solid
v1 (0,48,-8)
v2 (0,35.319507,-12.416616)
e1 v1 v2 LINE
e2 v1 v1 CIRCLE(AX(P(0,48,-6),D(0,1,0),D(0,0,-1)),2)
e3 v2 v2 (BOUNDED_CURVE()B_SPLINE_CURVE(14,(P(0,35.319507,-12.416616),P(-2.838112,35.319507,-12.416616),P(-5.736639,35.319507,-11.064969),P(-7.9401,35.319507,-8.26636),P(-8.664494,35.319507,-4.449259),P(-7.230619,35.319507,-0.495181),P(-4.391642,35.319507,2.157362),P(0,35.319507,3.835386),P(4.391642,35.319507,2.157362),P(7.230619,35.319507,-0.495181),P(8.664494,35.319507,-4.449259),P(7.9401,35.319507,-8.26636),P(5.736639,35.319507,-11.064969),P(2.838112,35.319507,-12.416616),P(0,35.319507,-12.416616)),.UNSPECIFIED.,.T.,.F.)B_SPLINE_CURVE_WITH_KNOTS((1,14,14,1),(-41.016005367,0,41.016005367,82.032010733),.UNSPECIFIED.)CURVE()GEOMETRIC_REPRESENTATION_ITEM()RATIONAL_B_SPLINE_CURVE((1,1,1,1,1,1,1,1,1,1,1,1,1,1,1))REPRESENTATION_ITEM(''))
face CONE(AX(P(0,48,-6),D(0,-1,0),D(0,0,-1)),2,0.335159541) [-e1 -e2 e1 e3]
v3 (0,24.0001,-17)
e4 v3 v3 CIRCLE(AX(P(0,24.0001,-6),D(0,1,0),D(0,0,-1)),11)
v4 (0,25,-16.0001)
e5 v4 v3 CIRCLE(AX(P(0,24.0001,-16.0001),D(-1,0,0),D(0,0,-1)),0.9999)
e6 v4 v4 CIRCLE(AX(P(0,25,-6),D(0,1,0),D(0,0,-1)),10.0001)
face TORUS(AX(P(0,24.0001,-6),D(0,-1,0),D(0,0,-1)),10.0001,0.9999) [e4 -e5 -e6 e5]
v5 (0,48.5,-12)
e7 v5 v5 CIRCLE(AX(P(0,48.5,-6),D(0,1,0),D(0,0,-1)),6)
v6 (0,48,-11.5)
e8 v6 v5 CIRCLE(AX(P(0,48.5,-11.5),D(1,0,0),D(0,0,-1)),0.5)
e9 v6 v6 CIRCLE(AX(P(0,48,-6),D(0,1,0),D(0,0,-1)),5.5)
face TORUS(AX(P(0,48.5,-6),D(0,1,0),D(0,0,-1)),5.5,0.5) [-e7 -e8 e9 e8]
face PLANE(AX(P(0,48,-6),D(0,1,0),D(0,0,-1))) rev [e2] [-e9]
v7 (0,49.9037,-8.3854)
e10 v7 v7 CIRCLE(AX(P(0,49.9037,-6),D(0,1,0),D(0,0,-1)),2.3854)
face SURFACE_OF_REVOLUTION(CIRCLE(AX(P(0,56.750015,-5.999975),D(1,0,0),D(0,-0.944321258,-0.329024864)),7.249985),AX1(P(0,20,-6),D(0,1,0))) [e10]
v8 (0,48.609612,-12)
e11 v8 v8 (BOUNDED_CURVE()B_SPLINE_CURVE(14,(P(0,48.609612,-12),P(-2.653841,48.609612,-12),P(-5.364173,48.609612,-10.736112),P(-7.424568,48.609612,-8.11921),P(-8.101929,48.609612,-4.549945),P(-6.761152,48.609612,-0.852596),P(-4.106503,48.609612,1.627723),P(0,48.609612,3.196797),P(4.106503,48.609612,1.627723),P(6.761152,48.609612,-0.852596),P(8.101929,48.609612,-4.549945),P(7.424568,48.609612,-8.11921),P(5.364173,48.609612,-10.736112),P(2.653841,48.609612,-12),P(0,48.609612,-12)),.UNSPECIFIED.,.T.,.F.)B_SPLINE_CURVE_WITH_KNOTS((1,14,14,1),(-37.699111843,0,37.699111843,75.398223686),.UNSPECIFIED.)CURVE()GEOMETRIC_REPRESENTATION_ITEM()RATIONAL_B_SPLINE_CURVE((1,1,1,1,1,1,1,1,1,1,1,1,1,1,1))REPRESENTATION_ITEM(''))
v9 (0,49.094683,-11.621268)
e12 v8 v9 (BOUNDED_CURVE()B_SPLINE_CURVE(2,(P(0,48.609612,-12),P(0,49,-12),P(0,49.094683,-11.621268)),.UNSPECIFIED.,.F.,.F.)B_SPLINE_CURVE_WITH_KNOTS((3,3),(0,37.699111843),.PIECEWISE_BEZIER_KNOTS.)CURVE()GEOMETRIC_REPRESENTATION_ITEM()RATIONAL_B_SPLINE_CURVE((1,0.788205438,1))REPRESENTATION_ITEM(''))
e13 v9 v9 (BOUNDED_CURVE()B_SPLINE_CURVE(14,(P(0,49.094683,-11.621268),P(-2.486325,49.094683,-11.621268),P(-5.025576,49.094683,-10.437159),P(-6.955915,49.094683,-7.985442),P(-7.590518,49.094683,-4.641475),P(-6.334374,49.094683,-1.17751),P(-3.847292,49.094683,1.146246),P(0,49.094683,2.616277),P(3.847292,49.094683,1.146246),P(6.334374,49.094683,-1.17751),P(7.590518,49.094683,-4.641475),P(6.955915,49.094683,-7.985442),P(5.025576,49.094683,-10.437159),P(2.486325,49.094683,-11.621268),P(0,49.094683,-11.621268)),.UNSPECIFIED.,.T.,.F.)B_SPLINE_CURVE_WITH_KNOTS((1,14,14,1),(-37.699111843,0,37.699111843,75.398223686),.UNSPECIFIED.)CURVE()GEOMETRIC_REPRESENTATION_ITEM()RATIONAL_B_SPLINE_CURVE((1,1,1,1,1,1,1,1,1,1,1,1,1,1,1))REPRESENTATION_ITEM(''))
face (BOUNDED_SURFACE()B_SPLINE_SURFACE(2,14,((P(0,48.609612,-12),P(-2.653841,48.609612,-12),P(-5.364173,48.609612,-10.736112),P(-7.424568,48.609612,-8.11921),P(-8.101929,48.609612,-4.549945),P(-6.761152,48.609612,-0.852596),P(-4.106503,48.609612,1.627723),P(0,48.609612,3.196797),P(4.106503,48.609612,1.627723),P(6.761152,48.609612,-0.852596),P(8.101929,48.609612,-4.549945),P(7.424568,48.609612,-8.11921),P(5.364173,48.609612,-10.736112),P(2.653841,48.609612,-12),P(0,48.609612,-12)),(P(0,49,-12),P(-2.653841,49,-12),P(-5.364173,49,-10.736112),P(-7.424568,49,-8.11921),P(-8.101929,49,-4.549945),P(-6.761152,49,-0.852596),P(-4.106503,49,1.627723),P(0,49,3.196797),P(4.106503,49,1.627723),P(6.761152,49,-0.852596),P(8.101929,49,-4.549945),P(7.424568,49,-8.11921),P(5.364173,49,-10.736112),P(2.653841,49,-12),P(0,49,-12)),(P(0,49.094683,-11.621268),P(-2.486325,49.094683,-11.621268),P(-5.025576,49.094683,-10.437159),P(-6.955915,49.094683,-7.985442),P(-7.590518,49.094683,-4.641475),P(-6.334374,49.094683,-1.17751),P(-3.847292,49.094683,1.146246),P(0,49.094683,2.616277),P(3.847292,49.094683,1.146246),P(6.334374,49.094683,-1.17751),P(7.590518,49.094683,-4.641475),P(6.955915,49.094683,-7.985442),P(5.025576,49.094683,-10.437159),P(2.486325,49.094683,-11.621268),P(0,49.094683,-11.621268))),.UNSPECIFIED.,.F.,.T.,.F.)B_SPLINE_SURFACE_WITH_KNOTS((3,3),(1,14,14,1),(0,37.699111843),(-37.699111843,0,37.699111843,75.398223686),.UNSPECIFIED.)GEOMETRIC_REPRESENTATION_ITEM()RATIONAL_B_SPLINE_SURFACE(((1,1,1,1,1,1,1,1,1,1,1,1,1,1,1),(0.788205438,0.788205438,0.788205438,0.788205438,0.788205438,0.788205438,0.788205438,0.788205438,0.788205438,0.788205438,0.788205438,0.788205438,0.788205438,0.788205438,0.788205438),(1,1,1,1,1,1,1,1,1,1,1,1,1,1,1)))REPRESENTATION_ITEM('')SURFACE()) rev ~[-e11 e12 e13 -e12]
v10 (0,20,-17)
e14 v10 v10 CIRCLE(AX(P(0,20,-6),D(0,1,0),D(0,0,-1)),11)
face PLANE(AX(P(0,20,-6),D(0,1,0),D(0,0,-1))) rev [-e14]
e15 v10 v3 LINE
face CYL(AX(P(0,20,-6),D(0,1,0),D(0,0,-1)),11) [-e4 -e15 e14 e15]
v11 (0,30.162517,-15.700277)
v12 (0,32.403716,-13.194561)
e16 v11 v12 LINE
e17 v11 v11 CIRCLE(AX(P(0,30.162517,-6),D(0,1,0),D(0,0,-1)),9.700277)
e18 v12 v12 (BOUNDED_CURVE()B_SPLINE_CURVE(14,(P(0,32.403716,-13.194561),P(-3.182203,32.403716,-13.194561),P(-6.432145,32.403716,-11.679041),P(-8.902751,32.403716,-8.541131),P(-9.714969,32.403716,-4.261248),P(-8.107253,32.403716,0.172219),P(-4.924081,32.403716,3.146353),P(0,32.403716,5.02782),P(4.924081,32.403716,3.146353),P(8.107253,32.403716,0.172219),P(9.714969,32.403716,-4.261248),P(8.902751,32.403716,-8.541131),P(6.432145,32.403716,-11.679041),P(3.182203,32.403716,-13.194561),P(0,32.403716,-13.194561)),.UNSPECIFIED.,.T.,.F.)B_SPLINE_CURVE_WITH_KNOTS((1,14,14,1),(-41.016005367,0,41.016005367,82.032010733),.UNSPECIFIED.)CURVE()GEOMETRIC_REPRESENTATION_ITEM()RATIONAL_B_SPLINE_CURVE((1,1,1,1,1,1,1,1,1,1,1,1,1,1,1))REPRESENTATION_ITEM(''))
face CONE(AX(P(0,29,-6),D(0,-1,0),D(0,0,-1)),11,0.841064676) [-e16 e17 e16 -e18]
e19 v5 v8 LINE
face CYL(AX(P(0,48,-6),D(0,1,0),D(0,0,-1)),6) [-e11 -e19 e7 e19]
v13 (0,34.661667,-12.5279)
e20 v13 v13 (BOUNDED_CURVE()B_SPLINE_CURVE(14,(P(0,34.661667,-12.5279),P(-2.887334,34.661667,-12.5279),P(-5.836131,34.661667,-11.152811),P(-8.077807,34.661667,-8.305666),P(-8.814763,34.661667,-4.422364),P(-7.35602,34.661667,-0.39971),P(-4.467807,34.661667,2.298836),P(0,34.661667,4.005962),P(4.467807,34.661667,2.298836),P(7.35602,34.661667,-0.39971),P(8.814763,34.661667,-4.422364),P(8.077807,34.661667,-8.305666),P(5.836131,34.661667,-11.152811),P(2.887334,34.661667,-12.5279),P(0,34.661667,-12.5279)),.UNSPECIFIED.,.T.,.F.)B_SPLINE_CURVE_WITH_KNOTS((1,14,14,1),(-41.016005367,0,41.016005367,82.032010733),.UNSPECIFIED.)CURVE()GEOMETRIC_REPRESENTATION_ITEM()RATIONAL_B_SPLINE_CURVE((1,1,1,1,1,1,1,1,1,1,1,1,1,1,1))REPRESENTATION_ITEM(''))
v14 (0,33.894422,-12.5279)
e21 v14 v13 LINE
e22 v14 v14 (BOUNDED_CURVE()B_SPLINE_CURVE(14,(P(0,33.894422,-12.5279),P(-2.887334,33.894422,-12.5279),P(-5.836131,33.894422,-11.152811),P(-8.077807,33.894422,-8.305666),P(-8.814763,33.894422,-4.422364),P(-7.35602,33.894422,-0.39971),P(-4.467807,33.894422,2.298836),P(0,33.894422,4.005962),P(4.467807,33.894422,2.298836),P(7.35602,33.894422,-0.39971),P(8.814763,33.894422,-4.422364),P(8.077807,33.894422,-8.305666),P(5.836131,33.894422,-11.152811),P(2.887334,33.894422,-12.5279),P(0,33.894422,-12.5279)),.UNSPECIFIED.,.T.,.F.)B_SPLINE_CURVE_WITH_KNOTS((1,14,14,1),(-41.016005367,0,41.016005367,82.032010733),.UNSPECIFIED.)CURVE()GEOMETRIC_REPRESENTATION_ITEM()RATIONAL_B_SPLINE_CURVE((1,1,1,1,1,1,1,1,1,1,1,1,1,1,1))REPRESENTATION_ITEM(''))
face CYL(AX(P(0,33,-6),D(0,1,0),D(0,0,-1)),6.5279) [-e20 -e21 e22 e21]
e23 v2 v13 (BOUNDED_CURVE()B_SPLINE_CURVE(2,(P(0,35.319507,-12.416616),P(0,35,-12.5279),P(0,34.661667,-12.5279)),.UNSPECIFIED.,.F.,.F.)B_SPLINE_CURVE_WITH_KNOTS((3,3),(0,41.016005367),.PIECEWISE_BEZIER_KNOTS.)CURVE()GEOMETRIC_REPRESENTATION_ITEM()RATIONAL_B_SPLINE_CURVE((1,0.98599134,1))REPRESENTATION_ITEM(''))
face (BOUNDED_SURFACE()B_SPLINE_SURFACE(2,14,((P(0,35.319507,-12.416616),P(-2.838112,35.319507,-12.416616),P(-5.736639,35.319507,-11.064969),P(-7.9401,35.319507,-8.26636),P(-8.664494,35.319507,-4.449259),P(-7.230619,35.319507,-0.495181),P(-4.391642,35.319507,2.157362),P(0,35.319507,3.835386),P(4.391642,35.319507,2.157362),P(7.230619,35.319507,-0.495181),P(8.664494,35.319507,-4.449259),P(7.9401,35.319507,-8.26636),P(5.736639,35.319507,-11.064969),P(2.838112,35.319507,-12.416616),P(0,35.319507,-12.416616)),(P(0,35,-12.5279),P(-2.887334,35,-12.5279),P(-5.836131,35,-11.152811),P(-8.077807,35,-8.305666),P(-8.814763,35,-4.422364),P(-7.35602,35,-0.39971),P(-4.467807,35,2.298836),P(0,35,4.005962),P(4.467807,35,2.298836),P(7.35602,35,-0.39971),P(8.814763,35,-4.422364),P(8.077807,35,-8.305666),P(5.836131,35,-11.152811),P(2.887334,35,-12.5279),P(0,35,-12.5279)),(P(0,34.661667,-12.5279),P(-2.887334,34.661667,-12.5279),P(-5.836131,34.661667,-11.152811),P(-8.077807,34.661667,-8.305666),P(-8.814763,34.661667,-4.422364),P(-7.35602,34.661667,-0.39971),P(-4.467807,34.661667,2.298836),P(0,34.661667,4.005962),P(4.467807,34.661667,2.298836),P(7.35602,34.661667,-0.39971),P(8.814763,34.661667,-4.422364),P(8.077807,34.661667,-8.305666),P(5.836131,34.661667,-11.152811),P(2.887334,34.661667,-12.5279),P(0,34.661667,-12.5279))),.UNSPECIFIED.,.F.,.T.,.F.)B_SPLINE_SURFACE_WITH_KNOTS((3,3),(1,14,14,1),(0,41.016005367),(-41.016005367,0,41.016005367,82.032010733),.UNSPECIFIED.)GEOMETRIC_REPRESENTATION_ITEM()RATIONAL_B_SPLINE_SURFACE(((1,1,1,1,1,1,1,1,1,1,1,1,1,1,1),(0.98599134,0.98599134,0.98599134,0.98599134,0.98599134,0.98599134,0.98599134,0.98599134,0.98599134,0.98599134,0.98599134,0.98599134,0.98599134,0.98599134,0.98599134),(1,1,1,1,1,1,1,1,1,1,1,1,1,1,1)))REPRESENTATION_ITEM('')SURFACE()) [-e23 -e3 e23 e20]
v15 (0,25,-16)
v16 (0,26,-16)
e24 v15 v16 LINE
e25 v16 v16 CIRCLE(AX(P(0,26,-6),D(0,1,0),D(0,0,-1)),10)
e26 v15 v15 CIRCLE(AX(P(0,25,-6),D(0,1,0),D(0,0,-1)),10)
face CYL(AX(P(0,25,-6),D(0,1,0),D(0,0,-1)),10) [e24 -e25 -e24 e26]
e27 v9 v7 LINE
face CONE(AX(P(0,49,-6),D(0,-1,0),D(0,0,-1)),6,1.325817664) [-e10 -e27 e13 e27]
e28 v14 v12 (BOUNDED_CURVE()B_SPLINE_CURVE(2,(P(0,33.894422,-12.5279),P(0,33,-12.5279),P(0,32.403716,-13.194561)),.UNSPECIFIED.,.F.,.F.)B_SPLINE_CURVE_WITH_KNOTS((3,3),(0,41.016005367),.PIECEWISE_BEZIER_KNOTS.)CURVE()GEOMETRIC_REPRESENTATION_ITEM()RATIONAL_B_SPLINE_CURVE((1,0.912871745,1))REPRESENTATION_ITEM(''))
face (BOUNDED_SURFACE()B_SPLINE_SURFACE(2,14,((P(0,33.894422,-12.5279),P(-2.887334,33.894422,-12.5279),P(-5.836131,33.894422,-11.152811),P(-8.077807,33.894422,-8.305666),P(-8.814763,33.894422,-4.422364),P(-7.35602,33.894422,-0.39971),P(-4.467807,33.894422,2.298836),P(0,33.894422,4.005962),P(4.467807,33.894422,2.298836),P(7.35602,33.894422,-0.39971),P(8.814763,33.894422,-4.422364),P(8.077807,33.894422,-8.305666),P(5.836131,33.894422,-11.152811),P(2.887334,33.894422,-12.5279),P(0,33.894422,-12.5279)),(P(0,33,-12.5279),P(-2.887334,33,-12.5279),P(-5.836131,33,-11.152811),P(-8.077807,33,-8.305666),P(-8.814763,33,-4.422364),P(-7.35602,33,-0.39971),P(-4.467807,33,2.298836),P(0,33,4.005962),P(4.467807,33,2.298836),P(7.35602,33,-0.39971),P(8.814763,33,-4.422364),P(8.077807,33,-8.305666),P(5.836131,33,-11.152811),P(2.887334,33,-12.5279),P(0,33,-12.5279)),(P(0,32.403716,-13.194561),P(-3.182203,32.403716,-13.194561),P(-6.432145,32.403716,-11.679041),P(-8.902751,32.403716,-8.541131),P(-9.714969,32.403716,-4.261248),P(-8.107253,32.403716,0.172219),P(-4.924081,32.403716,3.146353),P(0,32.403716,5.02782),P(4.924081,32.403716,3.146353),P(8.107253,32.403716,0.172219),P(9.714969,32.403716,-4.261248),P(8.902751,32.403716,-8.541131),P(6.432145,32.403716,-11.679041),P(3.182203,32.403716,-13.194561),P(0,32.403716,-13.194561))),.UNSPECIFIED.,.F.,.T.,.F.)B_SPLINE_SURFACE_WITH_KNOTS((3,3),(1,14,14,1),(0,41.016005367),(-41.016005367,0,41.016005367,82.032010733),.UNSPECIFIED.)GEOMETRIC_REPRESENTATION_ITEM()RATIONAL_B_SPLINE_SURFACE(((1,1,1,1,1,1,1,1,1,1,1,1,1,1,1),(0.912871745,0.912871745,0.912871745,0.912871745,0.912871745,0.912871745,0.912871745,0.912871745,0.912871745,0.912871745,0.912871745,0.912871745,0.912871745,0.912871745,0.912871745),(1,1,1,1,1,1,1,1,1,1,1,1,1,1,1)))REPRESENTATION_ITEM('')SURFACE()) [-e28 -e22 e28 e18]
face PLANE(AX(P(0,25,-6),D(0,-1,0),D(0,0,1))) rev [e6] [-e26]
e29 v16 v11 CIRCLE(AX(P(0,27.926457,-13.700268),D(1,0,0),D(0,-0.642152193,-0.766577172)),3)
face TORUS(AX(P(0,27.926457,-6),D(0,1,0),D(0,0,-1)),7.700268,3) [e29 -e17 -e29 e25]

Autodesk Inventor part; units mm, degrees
ref_plane "YZ Plane" through (0, 0, 0) normal (1, 0, 0) x (0, 1, 0)
ref_plane "XZ Plane" through (0, 0, 0) normal (0, 1, 0) x (-1, 0, 0)
ref_plane "XY Plane" through (0, 0, 0) normal (0, 0, 1) x (1, 0, 0)
sketch "Szkic1" plane through (0, 0, 0) normal (1, 0, 0) x (0, 1, 0)
  line L0 (20, -6) -> (20, -17)
  line L1 (20, -6) -> (64, -6)
  line L2 (20, -17) -> (25, -17)
  line L3 (25, -17) -> (25, -16)
  line L4 (25, -16) -> (26, -16)
  line L5 (26, -16) -> (26, -17)
  line L6 (26, -17) -> (29, -17)
  line L7 (29, -6) -> (33, -6)
  line L8 (29, -17) -> (33, -12.5279)
  line L9 (33, -12.5279) -> (35, -12.5279)
  line L10 (35, -6) -> (48, -6)
  line L11 (48, -8) -> (35, -12.5279)
  line L12 (48, -8) -> (48, -12)
  line L13 (48, -12) -> (49, -12)
  line L14 (49, -12) -> (50, -8)
  arc A0 (49.9037, -8.3854) -> (64, -6) centre (56.75, -6) ccw
  point P0 (0, 0)
revolve "Obrót1" add sketch "Szkic1" angle 360 about axis through (0, 20, -6) along (0, 1, 0)
fillet "Zaokrąglenie1" radius 1 1 edges at (0, 25, 5)
fillet "Zaokrąglenie2" radius 3 2 edges at (0, 26, 5) (0, 29, 5)
fillet "Zaokrąglenie3" radius 0.5 2 edges at (0, 49, 0) (0, 48, 0)
fillet "Zaokrąglenie4" radius 2 2 edges at (0, 35, 0.5279) (0, 33, 0.5279)
properties part number "pionek" material "Drewno (brzoza)"
